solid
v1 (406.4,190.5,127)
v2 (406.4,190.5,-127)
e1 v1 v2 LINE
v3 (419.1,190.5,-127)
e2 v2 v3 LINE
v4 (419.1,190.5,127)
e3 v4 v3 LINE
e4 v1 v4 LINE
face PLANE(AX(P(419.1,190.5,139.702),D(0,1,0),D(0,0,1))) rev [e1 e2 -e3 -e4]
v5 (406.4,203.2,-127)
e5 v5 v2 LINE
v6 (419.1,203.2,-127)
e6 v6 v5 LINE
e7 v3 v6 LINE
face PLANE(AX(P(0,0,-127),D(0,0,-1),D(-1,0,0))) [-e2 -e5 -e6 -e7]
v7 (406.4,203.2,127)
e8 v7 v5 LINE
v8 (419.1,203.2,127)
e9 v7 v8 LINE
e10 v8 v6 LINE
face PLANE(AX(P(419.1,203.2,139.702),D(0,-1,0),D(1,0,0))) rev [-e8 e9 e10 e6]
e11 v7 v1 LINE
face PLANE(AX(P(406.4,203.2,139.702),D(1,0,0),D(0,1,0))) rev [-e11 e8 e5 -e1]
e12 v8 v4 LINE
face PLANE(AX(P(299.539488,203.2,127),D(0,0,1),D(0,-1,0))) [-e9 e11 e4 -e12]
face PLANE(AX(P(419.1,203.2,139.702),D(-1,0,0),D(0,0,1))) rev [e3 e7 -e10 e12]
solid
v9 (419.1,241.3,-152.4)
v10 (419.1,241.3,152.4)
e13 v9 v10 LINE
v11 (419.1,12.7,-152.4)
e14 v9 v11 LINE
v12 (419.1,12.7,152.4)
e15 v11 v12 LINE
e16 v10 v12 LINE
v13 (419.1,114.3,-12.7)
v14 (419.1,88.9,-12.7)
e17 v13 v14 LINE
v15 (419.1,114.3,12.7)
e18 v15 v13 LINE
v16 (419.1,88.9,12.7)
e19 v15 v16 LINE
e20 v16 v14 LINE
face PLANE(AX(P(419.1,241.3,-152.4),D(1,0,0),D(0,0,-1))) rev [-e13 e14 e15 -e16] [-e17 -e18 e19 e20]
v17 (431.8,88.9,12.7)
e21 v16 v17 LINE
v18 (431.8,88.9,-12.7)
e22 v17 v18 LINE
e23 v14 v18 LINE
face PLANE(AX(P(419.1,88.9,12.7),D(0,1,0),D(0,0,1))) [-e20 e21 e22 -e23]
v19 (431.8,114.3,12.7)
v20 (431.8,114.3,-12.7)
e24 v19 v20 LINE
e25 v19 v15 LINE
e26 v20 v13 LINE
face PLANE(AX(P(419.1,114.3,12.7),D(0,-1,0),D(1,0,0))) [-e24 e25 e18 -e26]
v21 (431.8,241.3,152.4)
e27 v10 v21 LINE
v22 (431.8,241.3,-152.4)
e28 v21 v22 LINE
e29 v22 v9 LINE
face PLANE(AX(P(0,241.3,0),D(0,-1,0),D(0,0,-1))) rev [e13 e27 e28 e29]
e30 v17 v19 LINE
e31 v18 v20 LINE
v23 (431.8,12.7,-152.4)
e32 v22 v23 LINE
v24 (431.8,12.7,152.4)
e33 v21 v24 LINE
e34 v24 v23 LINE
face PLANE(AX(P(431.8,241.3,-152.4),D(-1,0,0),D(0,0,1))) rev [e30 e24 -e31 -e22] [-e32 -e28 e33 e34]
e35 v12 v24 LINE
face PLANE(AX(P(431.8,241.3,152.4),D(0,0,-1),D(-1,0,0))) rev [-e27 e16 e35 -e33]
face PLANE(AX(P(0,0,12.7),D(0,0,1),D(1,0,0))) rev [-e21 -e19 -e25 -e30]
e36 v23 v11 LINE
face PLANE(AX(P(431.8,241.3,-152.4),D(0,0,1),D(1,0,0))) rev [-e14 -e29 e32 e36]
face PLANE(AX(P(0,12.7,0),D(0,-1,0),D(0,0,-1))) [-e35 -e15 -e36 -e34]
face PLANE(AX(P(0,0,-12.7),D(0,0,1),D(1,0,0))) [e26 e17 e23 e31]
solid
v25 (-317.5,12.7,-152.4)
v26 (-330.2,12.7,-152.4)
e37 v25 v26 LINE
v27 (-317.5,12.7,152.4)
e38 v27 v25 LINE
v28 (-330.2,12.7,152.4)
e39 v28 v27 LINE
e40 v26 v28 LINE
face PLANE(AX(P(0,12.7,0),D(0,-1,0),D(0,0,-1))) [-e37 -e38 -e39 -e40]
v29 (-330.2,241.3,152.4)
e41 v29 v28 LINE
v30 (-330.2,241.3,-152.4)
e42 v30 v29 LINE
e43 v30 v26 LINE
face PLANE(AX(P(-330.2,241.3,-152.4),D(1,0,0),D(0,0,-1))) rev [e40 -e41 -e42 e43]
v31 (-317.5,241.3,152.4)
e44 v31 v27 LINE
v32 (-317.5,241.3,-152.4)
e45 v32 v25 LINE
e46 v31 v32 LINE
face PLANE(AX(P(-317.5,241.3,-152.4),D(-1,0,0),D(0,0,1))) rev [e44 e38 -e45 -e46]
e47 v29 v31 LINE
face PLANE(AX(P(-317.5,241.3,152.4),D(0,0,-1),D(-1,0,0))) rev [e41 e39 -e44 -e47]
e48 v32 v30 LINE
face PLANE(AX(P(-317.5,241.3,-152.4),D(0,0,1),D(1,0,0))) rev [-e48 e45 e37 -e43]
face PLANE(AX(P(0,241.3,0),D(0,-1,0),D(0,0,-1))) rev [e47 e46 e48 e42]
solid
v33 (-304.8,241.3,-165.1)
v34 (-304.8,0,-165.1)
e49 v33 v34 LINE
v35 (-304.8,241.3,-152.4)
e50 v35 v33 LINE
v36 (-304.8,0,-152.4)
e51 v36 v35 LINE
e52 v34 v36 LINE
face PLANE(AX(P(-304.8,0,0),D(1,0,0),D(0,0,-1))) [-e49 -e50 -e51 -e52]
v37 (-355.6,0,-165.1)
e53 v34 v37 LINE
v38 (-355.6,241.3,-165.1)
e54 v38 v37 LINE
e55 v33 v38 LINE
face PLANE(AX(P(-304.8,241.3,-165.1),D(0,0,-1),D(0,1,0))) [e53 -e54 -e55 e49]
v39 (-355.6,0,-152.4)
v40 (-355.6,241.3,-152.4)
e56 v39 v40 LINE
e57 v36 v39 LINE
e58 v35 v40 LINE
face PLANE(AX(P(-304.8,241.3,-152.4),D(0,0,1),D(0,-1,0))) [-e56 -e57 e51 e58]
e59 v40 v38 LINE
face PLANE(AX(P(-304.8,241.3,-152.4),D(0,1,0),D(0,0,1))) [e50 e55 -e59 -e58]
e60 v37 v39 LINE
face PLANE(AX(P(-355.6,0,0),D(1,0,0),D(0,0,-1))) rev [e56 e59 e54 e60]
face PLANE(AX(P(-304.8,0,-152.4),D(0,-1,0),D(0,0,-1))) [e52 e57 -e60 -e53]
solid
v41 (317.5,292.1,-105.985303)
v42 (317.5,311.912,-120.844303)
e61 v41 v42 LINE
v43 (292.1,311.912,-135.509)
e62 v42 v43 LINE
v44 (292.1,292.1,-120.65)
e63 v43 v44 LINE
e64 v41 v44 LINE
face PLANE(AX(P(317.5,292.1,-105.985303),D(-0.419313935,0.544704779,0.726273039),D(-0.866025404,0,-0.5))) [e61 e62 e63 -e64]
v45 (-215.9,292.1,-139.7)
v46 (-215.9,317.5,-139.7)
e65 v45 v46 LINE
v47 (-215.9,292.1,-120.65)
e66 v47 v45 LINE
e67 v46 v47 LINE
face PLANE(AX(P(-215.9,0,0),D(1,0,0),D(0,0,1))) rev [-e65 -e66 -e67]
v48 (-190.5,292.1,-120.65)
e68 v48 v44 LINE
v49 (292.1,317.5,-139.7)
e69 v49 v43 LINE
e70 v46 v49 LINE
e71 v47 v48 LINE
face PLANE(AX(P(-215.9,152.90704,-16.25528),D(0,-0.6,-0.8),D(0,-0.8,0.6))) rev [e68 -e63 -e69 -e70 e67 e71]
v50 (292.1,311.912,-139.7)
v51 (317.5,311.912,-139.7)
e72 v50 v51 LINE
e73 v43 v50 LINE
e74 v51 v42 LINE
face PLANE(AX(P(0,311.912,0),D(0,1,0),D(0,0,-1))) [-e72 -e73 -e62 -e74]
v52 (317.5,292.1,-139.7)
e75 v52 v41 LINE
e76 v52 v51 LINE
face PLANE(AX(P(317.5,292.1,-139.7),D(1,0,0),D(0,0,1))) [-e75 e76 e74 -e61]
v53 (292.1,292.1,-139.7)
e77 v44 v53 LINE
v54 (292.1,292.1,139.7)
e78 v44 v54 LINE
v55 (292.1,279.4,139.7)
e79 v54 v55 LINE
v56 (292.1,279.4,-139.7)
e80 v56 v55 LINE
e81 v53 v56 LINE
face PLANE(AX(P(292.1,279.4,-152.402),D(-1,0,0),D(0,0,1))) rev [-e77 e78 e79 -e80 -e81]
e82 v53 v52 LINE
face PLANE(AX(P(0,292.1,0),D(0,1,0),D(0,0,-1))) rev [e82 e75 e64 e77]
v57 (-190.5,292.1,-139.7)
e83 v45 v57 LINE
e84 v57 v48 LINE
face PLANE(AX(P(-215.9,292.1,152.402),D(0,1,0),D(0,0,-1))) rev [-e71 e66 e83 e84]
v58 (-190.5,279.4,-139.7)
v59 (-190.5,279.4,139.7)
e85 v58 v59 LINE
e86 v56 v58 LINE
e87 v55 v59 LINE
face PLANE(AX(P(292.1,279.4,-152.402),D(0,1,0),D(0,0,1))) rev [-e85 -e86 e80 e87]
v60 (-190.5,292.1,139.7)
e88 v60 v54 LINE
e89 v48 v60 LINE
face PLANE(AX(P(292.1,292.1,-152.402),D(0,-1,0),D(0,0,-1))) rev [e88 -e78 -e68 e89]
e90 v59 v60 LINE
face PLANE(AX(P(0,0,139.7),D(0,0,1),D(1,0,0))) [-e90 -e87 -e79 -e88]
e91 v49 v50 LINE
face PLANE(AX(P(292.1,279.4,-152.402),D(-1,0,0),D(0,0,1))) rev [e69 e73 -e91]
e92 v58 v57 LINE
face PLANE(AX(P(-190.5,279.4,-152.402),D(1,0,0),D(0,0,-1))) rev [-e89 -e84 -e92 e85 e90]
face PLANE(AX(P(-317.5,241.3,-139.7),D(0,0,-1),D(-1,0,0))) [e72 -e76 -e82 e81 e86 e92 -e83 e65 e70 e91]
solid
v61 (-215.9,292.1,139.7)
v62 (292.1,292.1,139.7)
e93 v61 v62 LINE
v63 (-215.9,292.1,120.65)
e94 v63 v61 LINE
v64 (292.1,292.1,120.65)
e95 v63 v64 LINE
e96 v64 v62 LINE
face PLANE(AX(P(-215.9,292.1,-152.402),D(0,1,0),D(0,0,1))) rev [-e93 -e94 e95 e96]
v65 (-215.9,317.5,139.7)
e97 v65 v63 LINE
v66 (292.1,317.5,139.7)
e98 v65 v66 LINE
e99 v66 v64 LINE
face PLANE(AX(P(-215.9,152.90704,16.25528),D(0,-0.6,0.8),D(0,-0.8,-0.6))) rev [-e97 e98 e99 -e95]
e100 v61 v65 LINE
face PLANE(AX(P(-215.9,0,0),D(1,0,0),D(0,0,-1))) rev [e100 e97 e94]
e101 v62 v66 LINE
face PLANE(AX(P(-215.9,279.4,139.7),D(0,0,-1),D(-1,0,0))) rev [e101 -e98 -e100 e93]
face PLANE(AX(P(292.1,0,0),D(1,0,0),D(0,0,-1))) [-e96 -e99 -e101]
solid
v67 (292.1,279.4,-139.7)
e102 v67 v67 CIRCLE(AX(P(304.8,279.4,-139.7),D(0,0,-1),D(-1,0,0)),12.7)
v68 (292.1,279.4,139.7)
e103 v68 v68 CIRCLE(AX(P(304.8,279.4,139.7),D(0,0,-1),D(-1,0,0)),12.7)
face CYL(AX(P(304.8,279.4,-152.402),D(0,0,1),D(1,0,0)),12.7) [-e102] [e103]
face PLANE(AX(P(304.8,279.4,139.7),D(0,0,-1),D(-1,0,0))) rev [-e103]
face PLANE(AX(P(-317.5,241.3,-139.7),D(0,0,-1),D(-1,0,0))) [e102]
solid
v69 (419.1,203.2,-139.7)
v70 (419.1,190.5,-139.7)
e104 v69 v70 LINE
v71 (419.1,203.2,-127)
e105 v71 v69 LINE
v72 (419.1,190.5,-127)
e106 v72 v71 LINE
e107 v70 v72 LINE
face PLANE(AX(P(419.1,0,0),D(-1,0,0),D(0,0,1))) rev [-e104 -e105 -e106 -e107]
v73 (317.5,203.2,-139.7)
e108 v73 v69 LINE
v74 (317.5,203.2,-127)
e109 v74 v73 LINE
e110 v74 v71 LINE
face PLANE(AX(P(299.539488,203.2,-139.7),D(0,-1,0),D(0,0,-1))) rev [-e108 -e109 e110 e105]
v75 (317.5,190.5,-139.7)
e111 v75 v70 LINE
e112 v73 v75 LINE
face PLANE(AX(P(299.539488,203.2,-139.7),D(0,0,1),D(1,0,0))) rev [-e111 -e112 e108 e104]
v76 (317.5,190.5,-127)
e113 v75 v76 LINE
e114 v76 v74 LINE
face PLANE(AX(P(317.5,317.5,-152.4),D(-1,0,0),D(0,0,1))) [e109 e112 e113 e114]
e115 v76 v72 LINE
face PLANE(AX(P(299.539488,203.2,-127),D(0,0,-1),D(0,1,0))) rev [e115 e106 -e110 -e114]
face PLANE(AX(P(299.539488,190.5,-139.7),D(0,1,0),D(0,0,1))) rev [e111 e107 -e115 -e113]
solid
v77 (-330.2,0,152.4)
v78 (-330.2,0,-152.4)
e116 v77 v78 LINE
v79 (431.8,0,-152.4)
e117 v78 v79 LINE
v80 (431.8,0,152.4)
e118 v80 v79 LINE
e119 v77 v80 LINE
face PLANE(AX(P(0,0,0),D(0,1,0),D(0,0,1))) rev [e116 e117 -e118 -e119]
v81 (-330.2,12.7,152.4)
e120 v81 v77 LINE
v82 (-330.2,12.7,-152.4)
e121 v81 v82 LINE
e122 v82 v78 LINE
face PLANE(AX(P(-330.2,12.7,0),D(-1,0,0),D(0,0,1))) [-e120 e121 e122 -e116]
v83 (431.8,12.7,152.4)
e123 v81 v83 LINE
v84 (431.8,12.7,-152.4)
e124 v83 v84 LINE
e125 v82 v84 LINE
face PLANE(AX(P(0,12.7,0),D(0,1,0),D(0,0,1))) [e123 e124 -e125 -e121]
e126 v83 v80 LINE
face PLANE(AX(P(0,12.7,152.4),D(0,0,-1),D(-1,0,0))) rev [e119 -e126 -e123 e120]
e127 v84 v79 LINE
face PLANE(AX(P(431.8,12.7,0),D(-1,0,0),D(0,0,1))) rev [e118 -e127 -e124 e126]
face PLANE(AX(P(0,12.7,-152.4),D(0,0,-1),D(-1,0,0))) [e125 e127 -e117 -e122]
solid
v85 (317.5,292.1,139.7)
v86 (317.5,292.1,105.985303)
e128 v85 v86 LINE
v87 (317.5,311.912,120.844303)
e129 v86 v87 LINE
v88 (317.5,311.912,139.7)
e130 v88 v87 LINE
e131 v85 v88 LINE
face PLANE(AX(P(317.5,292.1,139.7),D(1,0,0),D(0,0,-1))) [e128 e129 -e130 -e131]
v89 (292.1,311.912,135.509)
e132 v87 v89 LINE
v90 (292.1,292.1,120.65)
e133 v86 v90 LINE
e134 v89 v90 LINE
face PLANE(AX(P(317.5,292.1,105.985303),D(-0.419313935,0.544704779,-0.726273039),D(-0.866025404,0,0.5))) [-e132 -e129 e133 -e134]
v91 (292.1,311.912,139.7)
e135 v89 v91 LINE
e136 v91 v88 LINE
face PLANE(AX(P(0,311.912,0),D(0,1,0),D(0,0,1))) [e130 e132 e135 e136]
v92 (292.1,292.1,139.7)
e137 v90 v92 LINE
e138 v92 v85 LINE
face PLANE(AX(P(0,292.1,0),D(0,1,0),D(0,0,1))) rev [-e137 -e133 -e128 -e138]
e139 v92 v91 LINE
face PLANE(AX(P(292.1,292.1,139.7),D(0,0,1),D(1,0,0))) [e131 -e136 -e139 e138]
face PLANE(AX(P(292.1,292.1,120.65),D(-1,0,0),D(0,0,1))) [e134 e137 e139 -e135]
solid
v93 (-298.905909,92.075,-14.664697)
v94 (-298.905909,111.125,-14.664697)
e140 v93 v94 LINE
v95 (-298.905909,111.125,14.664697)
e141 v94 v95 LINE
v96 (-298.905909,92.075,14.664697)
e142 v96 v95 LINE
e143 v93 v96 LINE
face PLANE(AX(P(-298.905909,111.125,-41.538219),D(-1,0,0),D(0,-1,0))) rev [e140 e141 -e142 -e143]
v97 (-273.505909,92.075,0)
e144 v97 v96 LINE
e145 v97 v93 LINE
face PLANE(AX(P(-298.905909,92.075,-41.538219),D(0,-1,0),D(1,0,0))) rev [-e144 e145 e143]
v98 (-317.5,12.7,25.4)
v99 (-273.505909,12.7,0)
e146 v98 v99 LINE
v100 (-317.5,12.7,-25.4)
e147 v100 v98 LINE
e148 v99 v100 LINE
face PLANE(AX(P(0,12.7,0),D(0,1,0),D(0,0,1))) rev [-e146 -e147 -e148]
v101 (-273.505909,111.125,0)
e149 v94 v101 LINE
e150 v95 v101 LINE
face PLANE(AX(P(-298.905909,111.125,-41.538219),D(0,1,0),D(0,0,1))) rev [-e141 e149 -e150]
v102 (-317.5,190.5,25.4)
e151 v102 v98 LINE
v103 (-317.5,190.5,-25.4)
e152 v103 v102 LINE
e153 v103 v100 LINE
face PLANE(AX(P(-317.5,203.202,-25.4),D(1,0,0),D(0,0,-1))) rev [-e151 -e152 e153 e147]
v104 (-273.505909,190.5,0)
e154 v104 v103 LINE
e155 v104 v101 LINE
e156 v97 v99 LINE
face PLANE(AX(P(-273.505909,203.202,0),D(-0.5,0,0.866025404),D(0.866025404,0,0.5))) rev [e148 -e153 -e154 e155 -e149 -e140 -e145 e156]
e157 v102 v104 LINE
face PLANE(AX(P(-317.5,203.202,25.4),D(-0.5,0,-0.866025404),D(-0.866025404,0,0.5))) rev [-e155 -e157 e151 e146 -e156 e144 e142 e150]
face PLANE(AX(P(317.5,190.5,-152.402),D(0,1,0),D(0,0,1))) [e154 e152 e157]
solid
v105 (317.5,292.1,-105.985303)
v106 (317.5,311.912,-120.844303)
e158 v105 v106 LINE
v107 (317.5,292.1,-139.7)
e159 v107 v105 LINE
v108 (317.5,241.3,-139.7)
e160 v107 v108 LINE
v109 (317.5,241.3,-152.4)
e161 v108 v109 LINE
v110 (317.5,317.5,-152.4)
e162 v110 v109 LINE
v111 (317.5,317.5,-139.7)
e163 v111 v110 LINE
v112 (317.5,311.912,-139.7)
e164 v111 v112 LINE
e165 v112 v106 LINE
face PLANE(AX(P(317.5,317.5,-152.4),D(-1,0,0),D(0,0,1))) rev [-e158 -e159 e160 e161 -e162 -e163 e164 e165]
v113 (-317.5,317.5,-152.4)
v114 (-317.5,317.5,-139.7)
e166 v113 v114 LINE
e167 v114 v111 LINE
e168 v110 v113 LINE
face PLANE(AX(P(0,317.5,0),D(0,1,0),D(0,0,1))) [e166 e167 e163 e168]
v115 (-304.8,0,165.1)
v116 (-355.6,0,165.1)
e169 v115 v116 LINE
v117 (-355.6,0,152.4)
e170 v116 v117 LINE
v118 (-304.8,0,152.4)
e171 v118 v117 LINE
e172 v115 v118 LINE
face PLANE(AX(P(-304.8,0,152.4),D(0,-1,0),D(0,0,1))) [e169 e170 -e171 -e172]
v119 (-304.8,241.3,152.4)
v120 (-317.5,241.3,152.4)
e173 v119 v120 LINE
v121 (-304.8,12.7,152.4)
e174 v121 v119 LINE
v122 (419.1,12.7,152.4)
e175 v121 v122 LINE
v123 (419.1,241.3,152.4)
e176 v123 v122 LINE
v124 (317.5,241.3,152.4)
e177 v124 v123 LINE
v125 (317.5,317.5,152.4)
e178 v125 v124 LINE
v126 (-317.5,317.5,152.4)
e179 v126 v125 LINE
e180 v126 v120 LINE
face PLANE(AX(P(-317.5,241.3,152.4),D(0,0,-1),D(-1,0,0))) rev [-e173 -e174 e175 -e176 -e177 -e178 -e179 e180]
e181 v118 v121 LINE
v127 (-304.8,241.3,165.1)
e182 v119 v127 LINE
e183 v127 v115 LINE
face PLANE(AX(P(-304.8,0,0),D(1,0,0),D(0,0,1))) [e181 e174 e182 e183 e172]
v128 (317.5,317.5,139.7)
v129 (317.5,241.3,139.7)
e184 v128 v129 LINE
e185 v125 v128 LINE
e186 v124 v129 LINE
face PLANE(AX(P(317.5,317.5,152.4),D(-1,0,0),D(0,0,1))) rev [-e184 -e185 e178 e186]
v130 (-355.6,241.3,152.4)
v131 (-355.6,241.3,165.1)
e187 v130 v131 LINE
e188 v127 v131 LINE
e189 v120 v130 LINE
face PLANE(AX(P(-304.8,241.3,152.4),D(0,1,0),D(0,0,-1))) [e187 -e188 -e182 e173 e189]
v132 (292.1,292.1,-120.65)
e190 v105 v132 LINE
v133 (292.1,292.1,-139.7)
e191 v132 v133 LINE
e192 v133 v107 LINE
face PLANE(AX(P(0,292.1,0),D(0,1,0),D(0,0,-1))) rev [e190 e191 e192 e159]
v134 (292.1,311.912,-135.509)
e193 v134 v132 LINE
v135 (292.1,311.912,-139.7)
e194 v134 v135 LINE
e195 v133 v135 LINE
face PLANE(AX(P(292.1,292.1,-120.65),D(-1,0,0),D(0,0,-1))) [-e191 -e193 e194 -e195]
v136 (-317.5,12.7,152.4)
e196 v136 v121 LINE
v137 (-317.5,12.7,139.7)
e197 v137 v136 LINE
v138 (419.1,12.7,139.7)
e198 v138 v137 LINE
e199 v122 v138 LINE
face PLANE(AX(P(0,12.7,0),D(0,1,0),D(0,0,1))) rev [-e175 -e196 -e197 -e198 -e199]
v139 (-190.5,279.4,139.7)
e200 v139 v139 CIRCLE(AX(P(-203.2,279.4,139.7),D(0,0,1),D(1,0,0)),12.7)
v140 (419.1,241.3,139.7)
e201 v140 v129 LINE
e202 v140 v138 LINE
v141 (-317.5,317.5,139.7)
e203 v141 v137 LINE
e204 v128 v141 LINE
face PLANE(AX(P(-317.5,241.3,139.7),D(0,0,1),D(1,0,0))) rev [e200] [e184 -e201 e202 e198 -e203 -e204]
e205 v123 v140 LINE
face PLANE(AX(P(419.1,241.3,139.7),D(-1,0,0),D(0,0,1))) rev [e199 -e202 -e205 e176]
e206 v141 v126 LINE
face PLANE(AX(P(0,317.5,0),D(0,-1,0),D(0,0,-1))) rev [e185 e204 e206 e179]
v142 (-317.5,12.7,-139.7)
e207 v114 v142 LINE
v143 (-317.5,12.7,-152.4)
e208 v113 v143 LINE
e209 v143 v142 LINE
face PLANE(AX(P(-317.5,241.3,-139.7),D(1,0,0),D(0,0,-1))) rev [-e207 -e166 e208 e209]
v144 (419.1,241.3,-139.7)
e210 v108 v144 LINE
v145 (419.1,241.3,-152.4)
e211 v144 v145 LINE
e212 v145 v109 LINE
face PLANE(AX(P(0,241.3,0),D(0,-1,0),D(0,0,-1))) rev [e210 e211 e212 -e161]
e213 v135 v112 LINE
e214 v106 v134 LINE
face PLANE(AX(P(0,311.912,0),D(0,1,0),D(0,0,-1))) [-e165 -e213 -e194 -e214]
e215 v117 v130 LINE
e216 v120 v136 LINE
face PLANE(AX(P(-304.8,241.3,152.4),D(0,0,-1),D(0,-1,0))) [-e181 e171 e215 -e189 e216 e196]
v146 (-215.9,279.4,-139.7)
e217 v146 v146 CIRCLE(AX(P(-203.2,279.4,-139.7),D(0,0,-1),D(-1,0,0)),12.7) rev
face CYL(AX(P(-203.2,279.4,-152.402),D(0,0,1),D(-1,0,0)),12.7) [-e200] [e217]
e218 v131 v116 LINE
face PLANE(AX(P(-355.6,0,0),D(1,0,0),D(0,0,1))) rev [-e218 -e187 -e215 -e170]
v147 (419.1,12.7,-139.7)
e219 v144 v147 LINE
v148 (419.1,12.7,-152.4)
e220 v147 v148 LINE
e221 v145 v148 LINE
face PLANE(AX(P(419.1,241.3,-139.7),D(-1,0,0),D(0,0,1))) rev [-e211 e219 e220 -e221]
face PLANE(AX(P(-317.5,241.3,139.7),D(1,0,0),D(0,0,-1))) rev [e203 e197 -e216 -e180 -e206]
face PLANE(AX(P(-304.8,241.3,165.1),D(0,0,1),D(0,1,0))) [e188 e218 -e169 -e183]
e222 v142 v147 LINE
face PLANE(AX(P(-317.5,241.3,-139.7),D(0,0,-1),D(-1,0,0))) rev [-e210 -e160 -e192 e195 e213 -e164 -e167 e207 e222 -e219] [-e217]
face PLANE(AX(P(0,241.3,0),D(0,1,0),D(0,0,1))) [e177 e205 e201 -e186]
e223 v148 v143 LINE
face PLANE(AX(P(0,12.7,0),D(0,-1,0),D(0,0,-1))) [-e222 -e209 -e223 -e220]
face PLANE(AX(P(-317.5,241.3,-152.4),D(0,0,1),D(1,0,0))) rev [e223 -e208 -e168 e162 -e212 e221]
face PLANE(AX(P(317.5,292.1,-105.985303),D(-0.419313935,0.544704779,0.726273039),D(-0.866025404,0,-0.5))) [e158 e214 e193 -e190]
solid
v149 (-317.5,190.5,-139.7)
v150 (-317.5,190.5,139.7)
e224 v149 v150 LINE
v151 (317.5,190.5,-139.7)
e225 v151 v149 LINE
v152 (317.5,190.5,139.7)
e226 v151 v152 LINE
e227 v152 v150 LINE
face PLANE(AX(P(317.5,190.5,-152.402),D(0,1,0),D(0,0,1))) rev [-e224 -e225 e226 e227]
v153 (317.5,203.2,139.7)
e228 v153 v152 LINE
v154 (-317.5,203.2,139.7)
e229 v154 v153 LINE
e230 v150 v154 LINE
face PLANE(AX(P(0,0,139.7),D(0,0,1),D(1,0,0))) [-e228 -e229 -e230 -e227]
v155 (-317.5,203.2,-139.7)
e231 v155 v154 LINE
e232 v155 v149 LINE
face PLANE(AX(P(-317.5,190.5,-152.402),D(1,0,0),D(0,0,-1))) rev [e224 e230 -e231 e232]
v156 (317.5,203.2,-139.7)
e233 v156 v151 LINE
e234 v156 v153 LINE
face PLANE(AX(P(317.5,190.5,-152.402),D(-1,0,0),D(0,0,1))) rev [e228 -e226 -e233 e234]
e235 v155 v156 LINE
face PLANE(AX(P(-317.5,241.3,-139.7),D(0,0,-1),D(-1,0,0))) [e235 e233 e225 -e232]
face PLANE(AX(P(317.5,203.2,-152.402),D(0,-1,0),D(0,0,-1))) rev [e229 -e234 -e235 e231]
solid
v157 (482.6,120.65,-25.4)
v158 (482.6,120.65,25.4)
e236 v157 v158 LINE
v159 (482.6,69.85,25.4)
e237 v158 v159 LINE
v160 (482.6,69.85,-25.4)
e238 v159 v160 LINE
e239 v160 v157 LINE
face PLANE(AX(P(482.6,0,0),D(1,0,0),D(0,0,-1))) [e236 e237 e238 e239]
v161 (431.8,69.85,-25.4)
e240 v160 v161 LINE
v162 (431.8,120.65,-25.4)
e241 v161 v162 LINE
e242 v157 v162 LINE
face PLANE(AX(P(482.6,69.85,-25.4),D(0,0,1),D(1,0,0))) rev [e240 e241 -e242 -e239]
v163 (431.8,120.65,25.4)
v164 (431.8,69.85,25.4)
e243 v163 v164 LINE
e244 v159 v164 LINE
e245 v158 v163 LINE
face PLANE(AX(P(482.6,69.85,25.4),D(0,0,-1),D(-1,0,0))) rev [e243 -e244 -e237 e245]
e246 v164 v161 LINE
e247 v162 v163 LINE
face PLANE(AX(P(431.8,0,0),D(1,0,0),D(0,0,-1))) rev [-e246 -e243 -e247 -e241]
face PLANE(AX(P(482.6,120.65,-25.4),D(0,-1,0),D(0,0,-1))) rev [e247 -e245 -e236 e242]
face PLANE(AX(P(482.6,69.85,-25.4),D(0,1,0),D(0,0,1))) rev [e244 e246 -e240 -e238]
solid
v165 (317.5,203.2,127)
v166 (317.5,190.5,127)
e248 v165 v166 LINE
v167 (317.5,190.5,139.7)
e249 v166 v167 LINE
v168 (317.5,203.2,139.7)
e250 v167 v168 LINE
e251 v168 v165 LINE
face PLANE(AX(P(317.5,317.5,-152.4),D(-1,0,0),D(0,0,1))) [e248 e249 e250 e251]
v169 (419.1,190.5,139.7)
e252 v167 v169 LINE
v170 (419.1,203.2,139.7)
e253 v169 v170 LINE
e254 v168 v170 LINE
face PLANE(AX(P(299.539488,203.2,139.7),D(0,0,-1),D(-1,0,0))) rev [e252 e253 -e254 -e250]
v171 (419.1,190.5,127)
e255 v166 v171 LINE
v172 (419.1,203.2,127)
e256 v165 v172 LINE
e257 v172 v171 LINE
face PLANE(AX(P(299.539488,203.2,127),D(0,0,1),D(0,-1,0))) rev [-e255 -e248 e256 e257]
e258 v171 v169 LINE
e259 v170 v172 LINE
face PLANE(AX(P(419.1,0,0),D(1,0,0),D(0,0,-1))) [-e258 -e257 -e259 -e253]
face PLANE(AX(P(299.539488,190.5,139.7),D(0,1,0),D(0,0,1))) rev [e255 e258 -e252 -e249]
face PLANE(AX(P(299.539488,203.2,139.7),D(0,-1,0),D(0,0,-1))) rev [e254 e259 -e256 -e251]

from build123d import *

# Parameters (mm, degrees)
SKETCH1_W                             = 660.4
SKETCH1_H                             = 304.8
SKETCH1_W_2                           = 101.6
FOND_DEPTH                            = 12.7
SKETCH2_W                             = 736.6
SKETCH2_H                             = 12.7
COT_S_HAUT_DEPTH                      = 228.6
COT_S_HAUT_2_DEPTH                    = 228.6
SKETCH3_W                             = 12.7
SKETCH3_H                             = 304.8
COT_ES_BAS_DEPTH                      = 228.6
COT_ES_BAS_2_DEPTH                    = 228.6
SKETCH4_W                             = 635
SKETCH4_H                             = 12.7
SUPPORT_CAGE_DEPTH                    = 76.2
SKETCH5_W                             = 12.7
SKETCH5_H                             = 12.7
SUPPORT_TRAPPE_COT_ES_DEPTH           = 101.6
SUPPORT_TRAPPE_COT_ES_2_DEPTH         = 101.6
SUPPORT_TRAPPE_DEVANT_REACH           = 606.419
SKETCH6_W                             = 12.7
SKETCH6_H                             = 12.7
PLANCHER_MILLIEU_REACH                = 612.393
SKETCH7_W                             = 635
SKETCH7_H                             = 12.7
ROULEAU_REACH                         = 612.393
SKETCH8_R                             = 12.7
SKETCH10_W                            = 482.6
SKETCH10_H                            = 12.7
SOUTIEN_TAPIS_DEPTH                   = 279.4
REBORD_START                          = -25.4
REBORD_TAPIS_DEPTH                    = 508
V_POUR_VIS_SANS_FIN_DEPTH             = 177.8
TROU_V_VIS_SANS_FIN_REACH             = 559.21
SKETCH17_W                            = 25.4
SKETCH17_H                            = 19.05
TROU_V_VIS_SANS_FIN_DIRECTION_2_REACH = 559.21
TROU_SORTIE_VIS_SANS_FIN_DEPTH        = 12.7
TROU_SORTIE_VIS_SANS_FIN_DEPTH_BACK   = 12.7
SKETCH18_W                            = 12.7
SKETCH18_H                            = 25.4
SKETCH19_W                            = 12.7
SKETCH19_H                            = 241.3
REBORD_POUR_SAC_POUBELLE_DEPTH        = 25.4
SKETCH31_W                            = 50.8
SKETCH31_H                            = 50.8
BOITE_MOTEUR_VIS_SANS_DEPTH           = 50.8


with BuildPart() as part:
    # Sketch1 → Fond (new body)
    with BuildSketch(Plane(origin=(0, 0, 0), x_dir=(1, 0, 0), z_dir=(0, 1, 0))):
        Rectangle(SKETCH1_W, SKETCH1_H)
        with Locations((381, 0)):
            Rectangle(SKETCH1_W_2, SKETCH1_H)
    extrude(amount=FOND_DEPTH)


with BuildPart() as body_2:
    # Sketch2 → Cotés Haut (new body)
    with BuildSketch(Plane(origin=(0, 12.7, 0), x_dir=(1, 0, 0), z_dir=(0, 1, 0))):
        with Locations((50.8, 146.05)):
            Rectangle(SKETCH2_W, SKETCH2_H)
    extrude(amount=COT_S_HAUT_DEPTH)



with BuildPart() as body_3:
    # Sketch2 → Cot_s Haut 2 (new body)
    with BuildSketch(Plane(origin=(0, 12.7, 0), x_dir=(1, 0, 0), z_dir=(0, 1, 0))):
        with Locations((50.8, -146.05)):
            Rectangle(SKETCH2_W, SKETCH2_H)
    extrude(amount=COT_S_HAUT_2_DEPTH)


with BuildPart() as body_4:
    # Sketch3 → Cotées Bas (new body)
    with BuildSketch(Plane(origin=(0, 12.7, 0), x_dir=(1, 0, 0), z_dir=(0, 1, 0))):
        with Locations((-323.85, 0)):
            Rectangle(SKETCH3_W, SKETCH3_H)
    extrude(amount=COT_ES_BAS_DEPTH)


with BuildPart() as body_5:
    # Sketch3 → Cot_es Bas 2 (new body)
    with BuildSketch(Plane(origin=(0, 12.7, 0), x_dir=(1, 0, 0), z_dir=(0, 1, 0))):
        with Locations((425.45, 0)):
            Rectangle(SKETCH3_W, SKETCH3_H)
    extrude(amount=COT_ES_BAS_2_DEPTH)

    # Sketch18 → Trou sortie vis sans fin (cut, two sides: drawn at the far end of the back side and taken through both)
    with BuildSketch(Plane.XY.offset(-TROU_SORTIE_VIS_SANS_FIN_DEPTH_BACK)):
        with Locations((425.45, 101.6)):
            Rectangle(SKETCH18_W, SKETCH18_H)
    extrude(amount=TROU_SORTIE_VIS_SANS_FIN_DEPTH + TROU_SORTIE_VIS_SANS_FIN_DEPTH_BACK, mode=Mode.SUBTRACT)


with BuildPart() as body_2_1:
    add(body_2.part)

    add(body_3.part)  # Support Cage merges body 3
    # Sketch4 → Support Cage (add)
    with BuildSketch(Plane(origin=(0, 241.3, 0), x_dir=(1, 0, 0), z_dir=(0, 1, 0))):
        with Locations((0, 146.05)):
            Rectangle(SKETCH4_W, SKETCH4_H)
        with Locations((0, -146.05)):
            Rectangle(SKETCH4_W, SKETCH4_H)
    extrude(amount=SUPPORT_CAGE_DEPTH)


with BuildPart() as body_5_2:
    # Sketch5 → Support Trappe cotées (new body)
    with BuildSketch(Plane.ZY.offset(-419.1)):
        with Locations((-133.35, 196.85)):
            Rectangle(SKETCH5_W, SKETCH5_H)
    extrude(amount=SUPPORT_TRAPPE_COT_ES_DEPTH)


with BuildPart() as body_6:
    # Sketch5 → Support Trappe cot_es 2 (new body)
    with BuildSketch(Plane.ZY.offset(-419.1)):
        with Locations((133.35, 196.85)):
            Rectangle(SKETCH5_W, SKETCH5_H)
    extrude(amount=SUPPORT_TRAPPE_COT_ES_2_DEPTH)


with BuildPart() as body_7:

    # Sketch6 → Support Trappe devant (new, up to next)
    with BuildSketch(Plane.XY.offset(-127), mode=Mode.PRIVATE) as support_trappe_devant_sk1:
        with Locations((412.75, 196.85)):
            Rectangle(SKETCH6_W, SKETCH6_H)
    support_trappe_devant_tool1 = extrude(support_trappe_devant_sk1.sketch, amount=SUPPORT_TRAPPE_DEVANT_REACH, mode=Mode.PRIVATE) - body_6.part
    add(support_trappe_devant_tool1.solids().sort_by_distance((412.75, 196.85, -127))[0])


with BuildPart() as body_8:

    # Sketch7 → Plancher millieu (new, up to next)
    with BuildSketch(Plane(origin=(0, 0, 139.7), x_dir=(-1, 0, 0), z_dir=(0, 0, -1)), mode=Mode.PRIVATE) as plancher_millieu_sk1:
        with Locations((0, 196.85)):
            Rectangle(SKETCH7_W, SKETCH7_H)
    plancher_millieu_tool1 = extrude(plancher_millieu_sk1.sketch, amount=PLANCHER_MILLIEU_REACH, mode=Mode.PRIVATE) - body_2_1.part
    add(plancher_millieu_tool1.solids().sort_by_distance((0, 196.85, 139.7))[0])


with BuildPart() as body_9:

    # Sketch8 → Rouleau (new, up to next)
    with BuildSketch(Plane(origin=(0, 0, 139.7), x_dir=(-1, 0, 0), z_dir=(0, 0, -1)), mode=Mode.PRIVATE) as rouleau_sk1:
        with Locations((-304.8, 279.4)):
            Circle(SKETCH8_R)
    rouleau_tool1 = extrude(rouleau_sk1.sketch, amount=ROULEAU_REACH, mode=Mode.PRIVATE) - body_2_1.part
    rouleau = rouleau_tool1.solids().sort_by_distance((304.8, 279.4, 139.7))[0]
    add(rouleau)


with BuildPart() as body_2_2:
    add(body_2_1.part)

    # Mirror1: Rouleau across plane
    add(rouleau.mirror(Plane(origin=(50.8, 0, 0), x_dir=(0, 0, 1), z_dir=(1, 0, 0))))

    # Mirror9 2: loft between two sections, ruled curve by curve
    mirror9_2_from = [
        Edge.make_line((317.5, 311.912, -120.844303163), (317.5, 311.912, -139.7)),
        Edge.make_line((317.5, 292.1, -139.7), (317.5, 292.1, -105.985303163)),
        Edge.make_line((317.5, 292.1, -105.985303163), (317.5, 311.912, -120.844303163)),
        Edge.make_line((317.5, 292.1, -139.7), (317.5, 311.912, -139.7)),
    ]
    mirror9_2_to = [
        Edge.make_line((292.1, 311.912, -135.509), (292.1, 311.912, -139.7)),
        Edge.make_line((292.1, 292.1, -139.7), (292.1, 292.1, -120.65)),
        Edge.make_line((292.1, 292.1, -120.65), (292.1, 311.912, -135.509)),
        Edge.make_line((292.1, 292.1, -139.7), (292.1, 311.912, -139.7)),
    ]
    mirror9_2 = Solid(Shell([*[Face.make_surface_from_curves(mirror9_2_from[k], mirror9_2_to[k]) for k in range(4)], Face(Wire(mirror9_2_from)), Face(Wire(mirror9_2_to))]))
    add(mirror9_2)


with BuildPart() as body_10:
    # Sketch10 → Soutien tapis (new body)
    with BuildSketch(Plane(origin=(0, 0, 139.7), x_dir=(-1, 0, 0), z_dir=(0, 0, -1))):
        with Locations((-50.8, 285.75)):
            Rectangle(SKETCH10_W, SKETCH10_H)
    extrude(amount=SOUTIEN_TAPIS_DEPTH)


with BuildPart() as body_11:
    # Sketch11 → Rebord tapis (new body)
    with BuildSketch(Plane(origin=(317.5, 0, 0), x_dir=(0, 0, -1), z_dir=(1, 0, 0)).offset(REBORD_START)):
        Polygon((-139.7, 317.5), (-120.65, 292.1), (-139.7, 292.1), align=None)
    rebord_tapis = extrude(amount=-REBORD_TAPIS_DEPTH)


with BuildPart() as body_10_1:
    add(body_10.part)

    # Mirror5: Rebord tapis across plane
    add(rebord_tapis.mirror(Plane.XY))

    # Mirror9: read off the stored shape, not the designer's step
    # Mirror9: loft between two sections, ruled curve by curve
    mirror9_from = [
        Edge.make_line((317.5, 292.1, -139.7), (317.5, 292.1, -105.985303163)),
        Edge.make_line((317.5, 311.912, -120.844303163), (317.5, 311.912, -139.7)),
        Edge.make_line((317.5, 292.1, -105.985303163), (317.5, 311.912, -120.844303163)),
        Edge.make_line((317.5, 311.912, -139.7), (317.5, 292.1, -139.7)),
    ]
    mirror9_to = [
        Edge.make_line((292.1, 292.1, -139.7), (292.1, 292.1, -120.65)),
        Edge.make_line((292.1, 311.912, -135.509), (292.1, 311.912, -139.7)),
        Edge.make_line((292.1, 292.1, -120.65), (292.1, 311.912, -135.509)),
        Edge.make_line((292.1, 311.912, -139.7), (292.1, 292.1, -139.7)),
    ]
    mirror9 = Solid(Shell([*[Face.make_surface_from_curves(mirror9_from[k], mirror9_to[k]) for k in range(4)], Face(Wire(mirror9_from)), Face(Wire(mirror9_to))]))
    add(mirror9)


with BuildPart() as body_12:
    # Sketch13 → V pour vis sans fin (new body)
    with BuildSketch(Plane(origin=(0, 12.7, 0), x_dir=(1, 0, 0), z_dir=(0, 1, 0))):
        Polygon((-273.505909488, 0), (-317.5, 25.4), (-317.5, -25.4), align=None)
    extrude(amount=V_POUR_VIS_SANS_FIN_DEPTH)

    # Trou V vis sans fin: up to this face of the body (flat: up to its plane)
    trou_v_vis_sans_fin_end = Plane(body_12.part.faces().sort_by_distance((-295.502954744, 101.6, -12.7))[0])
    # Sketch17 → Trou V vis sans fin (cut, up to the picked face)
    with BuildSketch(Plane.XY, mode=Mode.PRIVATE) as trou_v_vis_sans_fin_sk1:
        with Locations((-286.205909488, 101.6)):
            Rectangle(SKETCH17_W, SKETCH17_H)
    trou_v_vis_sans_fin_tool1 = split(extrude(trou_v_vis_sans_fin_sk1.sketch, amount=-TROU_V_VIS_SANS_FIN_REACH, mode=Mode.PRIVATE), bisect_by=trou_v_vis_sans_fin_end, keep=Keep.BOTH, mode=Mode.PRIVATE)
    add(trou_v_vis_sans_fin_tool1.solids().sort_by(Axis((-286.205909, 101.6, 0), (0, 0, -1)))[0], mode=Mode.SUBTRACT)

    # Trou V vis sans fin direction 2: up to this face of the body (flat: up to its plane)
    trou_v_vis_sans_fin_direction_2_end = Plane(body_12.part.faces().sort_by_distance((-295.502954744, 101.6, 12.7))[0])
    # Sketch17 → Trou V vis sans fin direction 2 (cut, up to the picked face)
    with BuildSketch(Plane.XY, mode=Mode.PRIVATE) as trou_v_vis_sans_fin_direction_2_sk1:
        with Locations((-286.205909488, 101.6)):
            Rectangle(SKETCH17_W, SKETCH17_H)
    trou_v_vis_sans_fin_direction_2_tool1 = split(extrude(trou_v_vis_sans_fin_direction_2_sk1.sketch, amount=TROU_V_VIS_SANS_FIN_DIRECTION_2_REACH, mode=Mode.PRIVATE), bisect_by=trou_v_vis_sans_fin_direction_2_end, keep=Keep.BOTH, mode=Mode.PRIVATE)
    add(trou_v_vis_sans_fin_direction_2_tool1.solids().sort_by(Axis((-286.205909, 101.6, 0), (0, 0, 1)))[0], mode=Mode.SUBTRACT)


with BuildPart() as body_13:
    # Sketch19 → Rebord pour sac poubelle (new, symmetric)
    with BuildSketch(Plane.ZY.offset(330.2)):
        with Locations((-158.75, 120.65)):
            Rectangle(SKETCH19_W, SKETCH19_H)
    rebord_pour_sac_poubelle = extrude(amount=REBORD_POUR_SAC_POUBELLE_DEPTH, both=True)


with BuildPart() as body_14:
    # Rebord pour sac poubelle 2: read off the stored shape, not the designer's step
    # Rebord pour sac poubelle 2: loft between two sections, ruled curve by curve
    rebord_pour_sac_poubelle_2_from = [
        Edge.make_line((292.1, 292.1, 120.65), (292.1, 292.1, 139.7)),
        Edge.make_line((292.1, 292.1, 139.7), (317.5, 292.1, 139.7)),
        Edge.make_line((317.5, 292.1, 105.985303163), (292.1, 292.1, 120.65)),
        Edge.make_line((317.5, 292.1, 139.7), (317.5, 292.1, 105.985303163)),
    ]
    rebord_pour_sac_poubelle_2_to = [
        Edge.make_line((292.1, 311.912, 135.509), (292.1, 311.912, 139.7)),
        Edge.make_line((292.1, 311.912, 139.7), (317.5, 311.912, 139.7)),
        Edge.make_line((317.5, 311.912, 120.844303163), (292.1, 311.912, 135.509)),
        Edge.make_line((317.5, 311.912, 139.7), (317.5, 311.912, 120.844303163)),
    ]
    rebord_pour_sac_poubelle_2 = Solid(Shell([*[Face.make_surface_from_curves(rebord_pour_sac_poubelle_2_from[k], rebord_pour_sac_poubelle_2_to[k]) for k in range(4)], Face(Wire(rebord_pour_sac_poubelle_2_from)), Face(Wire(rebord_pour_sac_poubelle_2_to))]))
    add(rebord_pour_sac_poubelle_2)


with BuildPart() as body_15:
    # Sketch31 → Boite moteur vis sans (new body)
    with BuildSketch(Plane(origin=(431.8, 0, 0), x_dir=(0, 0, -1), z_dir=(1, 0, 0))):
        with Locations((0, 95.25)):
            Rectangle(SKETCH31_W, SKETCH31_H)
    extrude(amount=BOITE_MOTEUR_VIS_SANS_DEPTH)


with BuildPart() as body_2_3:
    add(body_2_2.part)

    # Mirror11: Rebord pour sac poubelle across plane
    add(rebord_pour_sac_poubelle.mirror(Plane.XY))


solid = Compound([part.part, body_4.part, body_5.part, body_5_2.part, body_6.part, body_7.part, body_8.part, body_9.part, body_11.part, body_10_1.part, body_12.part, body_13.part, body_14.part, body_15.part, body_2_3.part])
